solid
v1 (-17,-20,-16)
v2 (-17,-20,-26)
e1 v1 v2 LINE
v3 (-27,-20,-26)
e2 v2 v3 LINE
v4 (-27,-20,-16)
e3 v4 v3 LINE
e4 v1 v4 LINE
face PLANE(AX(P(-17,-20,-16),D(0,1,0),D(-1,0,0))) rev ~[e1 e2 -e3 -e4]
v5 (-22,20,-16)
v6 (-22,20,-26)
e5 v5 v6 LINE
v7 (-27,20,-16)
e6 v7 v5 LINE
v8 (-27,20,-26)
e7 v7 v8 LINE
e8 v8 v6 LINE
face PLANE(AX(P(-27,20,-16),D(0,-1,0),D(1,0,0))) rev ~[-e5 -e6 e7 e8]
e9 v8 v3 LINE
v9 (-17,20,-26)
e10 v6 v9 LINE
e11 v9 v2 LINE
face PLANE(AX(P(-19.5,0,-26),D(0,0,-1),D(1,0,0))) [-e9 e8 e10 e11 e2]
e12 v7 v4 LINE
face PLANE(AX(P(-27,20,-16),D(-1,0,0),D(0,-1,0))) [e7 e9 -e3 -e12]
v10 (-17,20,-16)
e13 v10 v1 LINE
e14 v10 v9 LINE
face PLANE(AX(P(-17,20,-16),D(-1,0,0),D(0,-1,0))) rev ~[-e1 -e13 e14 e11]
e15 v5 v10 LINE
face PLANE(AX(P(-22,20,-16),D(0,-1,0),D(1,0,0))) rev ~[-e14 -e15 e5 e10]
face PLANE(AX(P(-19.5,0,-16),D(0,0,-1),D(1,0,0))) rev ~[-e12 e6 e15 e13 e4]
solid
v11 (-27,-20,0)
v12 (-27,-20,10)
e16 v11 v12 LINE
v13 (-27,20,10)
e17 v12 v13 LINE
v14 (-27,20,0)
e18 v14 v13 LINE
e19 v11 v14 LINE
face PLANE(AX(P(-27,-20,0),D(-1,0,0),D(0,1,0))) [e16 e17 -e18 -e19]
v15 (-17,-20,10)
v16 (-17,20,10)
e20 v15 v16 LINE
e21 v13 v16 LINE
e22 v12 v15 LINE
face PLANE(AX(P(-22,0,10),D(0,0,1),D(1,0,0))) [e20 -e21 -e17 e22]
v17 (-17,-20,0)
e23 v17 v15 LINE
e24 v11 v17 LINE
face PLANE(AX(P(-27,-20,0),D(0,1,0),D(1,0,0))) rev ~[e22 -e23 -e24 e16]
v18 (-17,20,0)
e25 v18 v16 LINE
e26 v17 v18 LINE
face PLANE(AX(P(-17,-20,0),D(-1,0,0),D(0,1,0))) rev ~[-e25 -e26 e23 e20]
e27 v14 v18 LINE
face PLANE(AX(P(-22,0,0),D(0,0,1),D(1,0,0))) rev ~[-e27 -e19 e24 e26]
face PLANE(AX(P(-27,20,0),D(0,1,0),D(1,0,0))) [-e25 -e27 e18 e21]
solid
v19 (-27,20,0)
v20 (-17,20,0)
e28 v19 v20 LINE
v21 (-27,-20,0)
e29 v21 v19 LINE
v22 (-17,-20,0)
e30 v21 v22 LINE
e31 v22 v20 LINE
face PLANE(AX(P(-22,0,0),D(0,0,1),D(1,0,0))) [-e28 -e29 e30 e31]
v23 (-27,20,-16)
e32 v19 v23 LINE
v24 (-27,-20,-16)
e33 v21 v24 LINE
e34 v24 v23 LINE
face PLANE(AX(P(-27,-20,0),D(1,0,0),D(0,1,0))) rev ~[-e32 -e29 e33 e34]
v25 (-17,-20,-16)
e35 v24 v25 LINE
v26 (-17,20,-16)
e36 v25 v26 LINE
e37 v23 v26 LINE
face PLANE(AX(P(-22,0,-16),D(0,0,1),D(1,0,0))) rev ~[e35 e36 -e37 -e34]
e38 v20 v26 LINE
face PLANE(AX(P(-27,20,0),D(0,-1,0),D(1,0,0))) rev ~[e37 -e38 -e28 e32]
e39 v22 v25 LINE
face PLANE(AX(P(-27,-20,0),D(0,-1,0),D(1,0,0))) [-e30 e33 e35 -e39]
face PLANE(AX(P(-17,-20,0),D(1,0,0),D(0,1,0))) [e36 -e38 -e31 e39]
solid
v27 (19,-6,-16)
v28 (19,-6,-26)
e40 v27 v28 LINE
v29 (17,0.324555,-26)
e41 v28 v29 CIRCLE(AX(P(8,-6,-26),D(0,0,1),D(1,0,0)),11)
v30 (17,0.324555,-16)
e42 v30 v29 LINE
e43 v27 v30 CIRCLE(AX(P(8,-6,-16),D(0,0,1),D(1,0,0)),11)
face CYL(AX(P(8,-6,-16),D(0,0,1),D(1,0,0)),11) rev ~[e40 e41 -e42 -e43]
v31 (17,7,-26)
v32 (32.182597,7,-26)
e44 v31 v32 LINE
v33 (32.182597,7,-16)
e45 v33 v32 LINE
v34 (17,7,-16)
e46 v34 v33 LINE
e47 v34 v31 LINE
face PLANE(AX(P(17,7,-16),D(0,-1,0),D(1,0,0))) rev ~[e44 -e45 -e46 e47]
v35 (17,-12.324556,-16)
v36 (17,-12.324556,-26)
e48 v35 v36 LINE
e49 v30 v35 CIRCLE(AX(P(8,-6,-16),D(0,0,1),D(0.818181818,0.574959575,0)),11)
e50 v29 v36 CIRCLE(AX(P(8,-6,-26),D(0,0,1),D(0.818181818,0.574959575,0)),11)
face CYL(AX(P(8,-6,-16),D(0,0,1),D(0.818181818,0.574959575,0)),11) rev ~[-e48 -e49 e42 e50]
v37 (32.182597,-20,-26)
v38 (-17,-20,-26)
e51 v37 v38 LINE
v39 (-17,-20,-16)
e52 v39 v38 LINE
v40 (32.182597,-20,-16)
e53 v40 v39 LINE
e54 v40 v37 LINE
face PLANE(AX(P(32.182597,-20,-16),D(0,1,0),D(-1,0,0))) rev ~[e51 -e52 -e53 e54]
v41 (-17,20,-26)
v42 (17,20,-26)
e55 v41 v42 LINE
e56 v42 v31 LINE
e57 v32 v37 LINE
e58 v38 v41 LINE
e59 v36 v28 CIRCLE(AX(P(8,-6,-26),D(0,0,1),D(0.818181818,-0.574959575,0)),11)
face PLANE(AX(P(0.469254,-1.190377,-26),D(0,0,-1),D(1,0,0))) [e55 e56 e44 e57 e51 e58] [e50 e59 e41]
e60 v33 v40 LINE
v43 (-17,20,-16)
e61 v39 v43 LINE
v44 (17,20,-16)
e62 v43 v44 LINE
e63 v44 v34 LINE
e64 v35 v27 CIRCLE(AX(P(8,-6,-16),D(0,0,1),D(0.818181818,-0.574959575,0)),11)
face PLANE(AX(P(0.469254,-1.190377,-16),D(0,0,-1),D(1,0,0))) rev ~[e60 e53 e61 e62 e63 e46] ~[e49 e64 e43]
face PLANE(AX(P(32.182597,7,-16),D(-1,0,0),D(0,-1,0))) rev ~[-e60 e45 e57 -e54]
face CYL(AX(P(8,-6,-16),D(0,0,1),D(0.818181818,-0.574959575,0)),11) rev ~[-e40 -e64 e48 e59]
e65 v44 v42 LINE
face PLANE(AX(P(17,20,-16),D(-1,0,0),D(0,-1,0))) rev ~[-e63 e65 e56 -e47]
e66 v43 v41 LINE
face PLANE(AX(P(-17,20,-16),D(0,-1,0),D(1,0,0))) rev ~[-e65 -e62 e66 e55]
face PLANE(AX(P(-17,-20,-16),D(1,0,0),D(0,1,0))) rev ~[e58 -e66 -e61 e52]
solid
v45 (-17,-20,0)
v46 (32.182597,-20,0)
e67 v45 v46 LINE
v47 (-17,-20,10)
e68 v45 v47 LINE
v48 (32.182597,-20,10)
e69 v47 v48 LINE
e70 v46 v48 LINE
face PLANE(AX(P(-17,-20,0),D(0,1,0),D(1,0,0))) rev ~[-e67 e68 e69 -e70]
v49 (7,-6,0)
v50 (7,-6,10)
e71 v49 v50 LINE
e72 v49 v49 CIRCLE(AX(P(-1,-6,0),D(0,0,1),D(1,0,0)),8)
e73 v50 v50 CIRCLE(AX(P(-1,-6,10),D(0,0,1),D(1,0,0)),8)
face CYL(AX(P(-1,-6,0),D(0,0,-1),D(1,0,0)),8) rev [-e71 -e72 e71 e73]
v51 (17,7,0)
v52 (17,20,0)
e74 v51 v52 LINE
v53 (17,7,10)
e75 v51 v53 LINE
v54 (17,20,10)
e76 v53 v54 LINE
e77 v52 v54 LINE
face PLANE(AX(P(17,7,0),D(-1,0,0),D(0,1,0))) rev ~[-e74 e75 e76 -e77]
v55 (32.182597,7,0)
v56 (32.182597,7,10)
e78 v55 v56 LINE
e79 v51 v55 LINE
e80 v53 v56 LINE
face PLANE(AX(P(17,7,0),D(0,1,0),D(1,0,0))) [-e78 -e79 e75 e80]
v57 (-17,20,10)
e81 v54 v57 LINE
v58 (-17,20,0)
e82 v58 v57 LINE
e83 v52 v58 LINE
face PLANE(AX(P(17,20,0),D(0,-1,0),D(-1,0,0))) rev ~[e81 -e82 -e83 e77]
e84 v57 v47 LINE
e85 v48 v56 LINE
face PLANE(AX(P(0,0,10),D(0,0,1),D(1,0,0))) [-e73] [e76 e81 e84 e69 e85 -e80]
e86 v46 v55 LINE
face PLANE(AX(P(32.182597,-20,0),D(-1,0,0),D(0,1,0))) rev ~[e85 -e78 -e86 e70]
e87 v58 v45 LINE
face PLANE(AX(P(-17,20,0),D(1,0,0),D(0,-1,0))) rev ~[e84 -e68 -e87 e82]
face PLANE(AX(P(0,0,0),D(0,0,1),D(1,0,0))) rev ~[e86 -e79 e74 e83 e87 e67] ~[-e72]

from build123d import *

# Parameters (mm, degrees)
F0_R     = 8
F0_W     = 15.1825966239
F0_H     = 27
F1_DEPTH = 10
F0_W_2   = 10
F0_H_2   = 40
F2_DEPTH = 16
F3_DEPTH = 10
F5_DEPTH = 10
F4_W     = 5
F4_H     = 40.000000447
F4_H_2   = 40
F6_DEPTH = 10


# Not quite as in the source:
# - ends of sketch curves that miss each other by under 0.0002 mm in the source are joined


with BuildPart() as f1:
    # F0 (on Top) → F1 (new body)
    with BuildSketch(Plane.XY):
        Polygon((17, 20), (-17, 20), (-17, -20), (17, -20), (17, 7), align=None)
        with Locations((-1, -6)):
            Circle(F0_R, mode=Mode.SUBTRACT)
        with Locations((24.5912983119, -6.5)):
            Rectangle(F0_W, F0_H)
    extrude(amount=F1_DEPTH)


with BuildPart() as f2:
    # F0 (on Top) → F2 (new body)
    with BuildSketch(Plane.XY):
        with Locations((-22, 0)):
            Rectangle(F0_W_2, F0_H_2)
    extrude(amount=-F2_DEPTH)

    # F4 (on face) → F5 (join)
    with BuildSketch(Plane(origin=(0, 0, -16), x_dir=(1, 0, 0), z_dir=(0, 0, -1))):
        with BuildLine():
            Line((-17, 20.000000447), (-17, -19.999999553))
            Line((-17, -19.999999553), (17, -19.999999553))
            Line((17, -19.999999553), (17, -6.999999553))
            Line((17, -6.999999553), (17, -0.3245548733))
            ThreePointArc((17, -0.3245548733), (-3, 6.000000447), (17, 12.3245557674))
            Line((17, 12.3245557674), (17, 20.000000447))
            Line((17, 20.000000447), (-17, 20.000000447))
        make_face()
        with BuildLine():
            Line((17, -0.3245548733), (17, -6.999999553))
            Line((17, -6.999999553), (32.1825966239, -6.999999553))
            Line((32.1825966239, -6.999999553), (32.1825966239, 20.000000447))
            Line((32.1825966239, 20.000000447), (17, 20.000000447))
            Line((17, 20.000000447), (17, 12.3245557674))
            ThreePointArc((17, 12.3245557674), (18.4880884817, 9.3166252374), (19, 6.000000447))
            ThreePointArc((19, 6.000000447), (18.4880884817, 2.6833756567), (17, -0.3245548733))
        make_face()
    extrude(amount=F5_DEPTH)


with BuildPart() as f3:
    # F0 (on Top) → F3 (new body)
    with BuildSketch(Plane.XY):
        with Locations((-22, 0)):
            Rectangle(F0_W_2, F0_H_2)
    extrude(amount=F3_DEPTH)


with BuildPart() as f6:
    # F4 (on face) → F6 (new body)
    with BuildSketch(Plane(origin=(0, 0, -16), x_dir=(1, 0, 0), z_dir=(0, 0, -1))):
        with Locations((-19.5, 2.235e-07)):
            Rectangle(F4_W, F4_H)
        with Locations((-24.5, 4.47e-07)):
            Rectangle(F4_W, F4_H_2)
    extrude(amount=F6_DEPTH)


solid = Compound([f1.part, f2.part, f3.part, f6.part])
